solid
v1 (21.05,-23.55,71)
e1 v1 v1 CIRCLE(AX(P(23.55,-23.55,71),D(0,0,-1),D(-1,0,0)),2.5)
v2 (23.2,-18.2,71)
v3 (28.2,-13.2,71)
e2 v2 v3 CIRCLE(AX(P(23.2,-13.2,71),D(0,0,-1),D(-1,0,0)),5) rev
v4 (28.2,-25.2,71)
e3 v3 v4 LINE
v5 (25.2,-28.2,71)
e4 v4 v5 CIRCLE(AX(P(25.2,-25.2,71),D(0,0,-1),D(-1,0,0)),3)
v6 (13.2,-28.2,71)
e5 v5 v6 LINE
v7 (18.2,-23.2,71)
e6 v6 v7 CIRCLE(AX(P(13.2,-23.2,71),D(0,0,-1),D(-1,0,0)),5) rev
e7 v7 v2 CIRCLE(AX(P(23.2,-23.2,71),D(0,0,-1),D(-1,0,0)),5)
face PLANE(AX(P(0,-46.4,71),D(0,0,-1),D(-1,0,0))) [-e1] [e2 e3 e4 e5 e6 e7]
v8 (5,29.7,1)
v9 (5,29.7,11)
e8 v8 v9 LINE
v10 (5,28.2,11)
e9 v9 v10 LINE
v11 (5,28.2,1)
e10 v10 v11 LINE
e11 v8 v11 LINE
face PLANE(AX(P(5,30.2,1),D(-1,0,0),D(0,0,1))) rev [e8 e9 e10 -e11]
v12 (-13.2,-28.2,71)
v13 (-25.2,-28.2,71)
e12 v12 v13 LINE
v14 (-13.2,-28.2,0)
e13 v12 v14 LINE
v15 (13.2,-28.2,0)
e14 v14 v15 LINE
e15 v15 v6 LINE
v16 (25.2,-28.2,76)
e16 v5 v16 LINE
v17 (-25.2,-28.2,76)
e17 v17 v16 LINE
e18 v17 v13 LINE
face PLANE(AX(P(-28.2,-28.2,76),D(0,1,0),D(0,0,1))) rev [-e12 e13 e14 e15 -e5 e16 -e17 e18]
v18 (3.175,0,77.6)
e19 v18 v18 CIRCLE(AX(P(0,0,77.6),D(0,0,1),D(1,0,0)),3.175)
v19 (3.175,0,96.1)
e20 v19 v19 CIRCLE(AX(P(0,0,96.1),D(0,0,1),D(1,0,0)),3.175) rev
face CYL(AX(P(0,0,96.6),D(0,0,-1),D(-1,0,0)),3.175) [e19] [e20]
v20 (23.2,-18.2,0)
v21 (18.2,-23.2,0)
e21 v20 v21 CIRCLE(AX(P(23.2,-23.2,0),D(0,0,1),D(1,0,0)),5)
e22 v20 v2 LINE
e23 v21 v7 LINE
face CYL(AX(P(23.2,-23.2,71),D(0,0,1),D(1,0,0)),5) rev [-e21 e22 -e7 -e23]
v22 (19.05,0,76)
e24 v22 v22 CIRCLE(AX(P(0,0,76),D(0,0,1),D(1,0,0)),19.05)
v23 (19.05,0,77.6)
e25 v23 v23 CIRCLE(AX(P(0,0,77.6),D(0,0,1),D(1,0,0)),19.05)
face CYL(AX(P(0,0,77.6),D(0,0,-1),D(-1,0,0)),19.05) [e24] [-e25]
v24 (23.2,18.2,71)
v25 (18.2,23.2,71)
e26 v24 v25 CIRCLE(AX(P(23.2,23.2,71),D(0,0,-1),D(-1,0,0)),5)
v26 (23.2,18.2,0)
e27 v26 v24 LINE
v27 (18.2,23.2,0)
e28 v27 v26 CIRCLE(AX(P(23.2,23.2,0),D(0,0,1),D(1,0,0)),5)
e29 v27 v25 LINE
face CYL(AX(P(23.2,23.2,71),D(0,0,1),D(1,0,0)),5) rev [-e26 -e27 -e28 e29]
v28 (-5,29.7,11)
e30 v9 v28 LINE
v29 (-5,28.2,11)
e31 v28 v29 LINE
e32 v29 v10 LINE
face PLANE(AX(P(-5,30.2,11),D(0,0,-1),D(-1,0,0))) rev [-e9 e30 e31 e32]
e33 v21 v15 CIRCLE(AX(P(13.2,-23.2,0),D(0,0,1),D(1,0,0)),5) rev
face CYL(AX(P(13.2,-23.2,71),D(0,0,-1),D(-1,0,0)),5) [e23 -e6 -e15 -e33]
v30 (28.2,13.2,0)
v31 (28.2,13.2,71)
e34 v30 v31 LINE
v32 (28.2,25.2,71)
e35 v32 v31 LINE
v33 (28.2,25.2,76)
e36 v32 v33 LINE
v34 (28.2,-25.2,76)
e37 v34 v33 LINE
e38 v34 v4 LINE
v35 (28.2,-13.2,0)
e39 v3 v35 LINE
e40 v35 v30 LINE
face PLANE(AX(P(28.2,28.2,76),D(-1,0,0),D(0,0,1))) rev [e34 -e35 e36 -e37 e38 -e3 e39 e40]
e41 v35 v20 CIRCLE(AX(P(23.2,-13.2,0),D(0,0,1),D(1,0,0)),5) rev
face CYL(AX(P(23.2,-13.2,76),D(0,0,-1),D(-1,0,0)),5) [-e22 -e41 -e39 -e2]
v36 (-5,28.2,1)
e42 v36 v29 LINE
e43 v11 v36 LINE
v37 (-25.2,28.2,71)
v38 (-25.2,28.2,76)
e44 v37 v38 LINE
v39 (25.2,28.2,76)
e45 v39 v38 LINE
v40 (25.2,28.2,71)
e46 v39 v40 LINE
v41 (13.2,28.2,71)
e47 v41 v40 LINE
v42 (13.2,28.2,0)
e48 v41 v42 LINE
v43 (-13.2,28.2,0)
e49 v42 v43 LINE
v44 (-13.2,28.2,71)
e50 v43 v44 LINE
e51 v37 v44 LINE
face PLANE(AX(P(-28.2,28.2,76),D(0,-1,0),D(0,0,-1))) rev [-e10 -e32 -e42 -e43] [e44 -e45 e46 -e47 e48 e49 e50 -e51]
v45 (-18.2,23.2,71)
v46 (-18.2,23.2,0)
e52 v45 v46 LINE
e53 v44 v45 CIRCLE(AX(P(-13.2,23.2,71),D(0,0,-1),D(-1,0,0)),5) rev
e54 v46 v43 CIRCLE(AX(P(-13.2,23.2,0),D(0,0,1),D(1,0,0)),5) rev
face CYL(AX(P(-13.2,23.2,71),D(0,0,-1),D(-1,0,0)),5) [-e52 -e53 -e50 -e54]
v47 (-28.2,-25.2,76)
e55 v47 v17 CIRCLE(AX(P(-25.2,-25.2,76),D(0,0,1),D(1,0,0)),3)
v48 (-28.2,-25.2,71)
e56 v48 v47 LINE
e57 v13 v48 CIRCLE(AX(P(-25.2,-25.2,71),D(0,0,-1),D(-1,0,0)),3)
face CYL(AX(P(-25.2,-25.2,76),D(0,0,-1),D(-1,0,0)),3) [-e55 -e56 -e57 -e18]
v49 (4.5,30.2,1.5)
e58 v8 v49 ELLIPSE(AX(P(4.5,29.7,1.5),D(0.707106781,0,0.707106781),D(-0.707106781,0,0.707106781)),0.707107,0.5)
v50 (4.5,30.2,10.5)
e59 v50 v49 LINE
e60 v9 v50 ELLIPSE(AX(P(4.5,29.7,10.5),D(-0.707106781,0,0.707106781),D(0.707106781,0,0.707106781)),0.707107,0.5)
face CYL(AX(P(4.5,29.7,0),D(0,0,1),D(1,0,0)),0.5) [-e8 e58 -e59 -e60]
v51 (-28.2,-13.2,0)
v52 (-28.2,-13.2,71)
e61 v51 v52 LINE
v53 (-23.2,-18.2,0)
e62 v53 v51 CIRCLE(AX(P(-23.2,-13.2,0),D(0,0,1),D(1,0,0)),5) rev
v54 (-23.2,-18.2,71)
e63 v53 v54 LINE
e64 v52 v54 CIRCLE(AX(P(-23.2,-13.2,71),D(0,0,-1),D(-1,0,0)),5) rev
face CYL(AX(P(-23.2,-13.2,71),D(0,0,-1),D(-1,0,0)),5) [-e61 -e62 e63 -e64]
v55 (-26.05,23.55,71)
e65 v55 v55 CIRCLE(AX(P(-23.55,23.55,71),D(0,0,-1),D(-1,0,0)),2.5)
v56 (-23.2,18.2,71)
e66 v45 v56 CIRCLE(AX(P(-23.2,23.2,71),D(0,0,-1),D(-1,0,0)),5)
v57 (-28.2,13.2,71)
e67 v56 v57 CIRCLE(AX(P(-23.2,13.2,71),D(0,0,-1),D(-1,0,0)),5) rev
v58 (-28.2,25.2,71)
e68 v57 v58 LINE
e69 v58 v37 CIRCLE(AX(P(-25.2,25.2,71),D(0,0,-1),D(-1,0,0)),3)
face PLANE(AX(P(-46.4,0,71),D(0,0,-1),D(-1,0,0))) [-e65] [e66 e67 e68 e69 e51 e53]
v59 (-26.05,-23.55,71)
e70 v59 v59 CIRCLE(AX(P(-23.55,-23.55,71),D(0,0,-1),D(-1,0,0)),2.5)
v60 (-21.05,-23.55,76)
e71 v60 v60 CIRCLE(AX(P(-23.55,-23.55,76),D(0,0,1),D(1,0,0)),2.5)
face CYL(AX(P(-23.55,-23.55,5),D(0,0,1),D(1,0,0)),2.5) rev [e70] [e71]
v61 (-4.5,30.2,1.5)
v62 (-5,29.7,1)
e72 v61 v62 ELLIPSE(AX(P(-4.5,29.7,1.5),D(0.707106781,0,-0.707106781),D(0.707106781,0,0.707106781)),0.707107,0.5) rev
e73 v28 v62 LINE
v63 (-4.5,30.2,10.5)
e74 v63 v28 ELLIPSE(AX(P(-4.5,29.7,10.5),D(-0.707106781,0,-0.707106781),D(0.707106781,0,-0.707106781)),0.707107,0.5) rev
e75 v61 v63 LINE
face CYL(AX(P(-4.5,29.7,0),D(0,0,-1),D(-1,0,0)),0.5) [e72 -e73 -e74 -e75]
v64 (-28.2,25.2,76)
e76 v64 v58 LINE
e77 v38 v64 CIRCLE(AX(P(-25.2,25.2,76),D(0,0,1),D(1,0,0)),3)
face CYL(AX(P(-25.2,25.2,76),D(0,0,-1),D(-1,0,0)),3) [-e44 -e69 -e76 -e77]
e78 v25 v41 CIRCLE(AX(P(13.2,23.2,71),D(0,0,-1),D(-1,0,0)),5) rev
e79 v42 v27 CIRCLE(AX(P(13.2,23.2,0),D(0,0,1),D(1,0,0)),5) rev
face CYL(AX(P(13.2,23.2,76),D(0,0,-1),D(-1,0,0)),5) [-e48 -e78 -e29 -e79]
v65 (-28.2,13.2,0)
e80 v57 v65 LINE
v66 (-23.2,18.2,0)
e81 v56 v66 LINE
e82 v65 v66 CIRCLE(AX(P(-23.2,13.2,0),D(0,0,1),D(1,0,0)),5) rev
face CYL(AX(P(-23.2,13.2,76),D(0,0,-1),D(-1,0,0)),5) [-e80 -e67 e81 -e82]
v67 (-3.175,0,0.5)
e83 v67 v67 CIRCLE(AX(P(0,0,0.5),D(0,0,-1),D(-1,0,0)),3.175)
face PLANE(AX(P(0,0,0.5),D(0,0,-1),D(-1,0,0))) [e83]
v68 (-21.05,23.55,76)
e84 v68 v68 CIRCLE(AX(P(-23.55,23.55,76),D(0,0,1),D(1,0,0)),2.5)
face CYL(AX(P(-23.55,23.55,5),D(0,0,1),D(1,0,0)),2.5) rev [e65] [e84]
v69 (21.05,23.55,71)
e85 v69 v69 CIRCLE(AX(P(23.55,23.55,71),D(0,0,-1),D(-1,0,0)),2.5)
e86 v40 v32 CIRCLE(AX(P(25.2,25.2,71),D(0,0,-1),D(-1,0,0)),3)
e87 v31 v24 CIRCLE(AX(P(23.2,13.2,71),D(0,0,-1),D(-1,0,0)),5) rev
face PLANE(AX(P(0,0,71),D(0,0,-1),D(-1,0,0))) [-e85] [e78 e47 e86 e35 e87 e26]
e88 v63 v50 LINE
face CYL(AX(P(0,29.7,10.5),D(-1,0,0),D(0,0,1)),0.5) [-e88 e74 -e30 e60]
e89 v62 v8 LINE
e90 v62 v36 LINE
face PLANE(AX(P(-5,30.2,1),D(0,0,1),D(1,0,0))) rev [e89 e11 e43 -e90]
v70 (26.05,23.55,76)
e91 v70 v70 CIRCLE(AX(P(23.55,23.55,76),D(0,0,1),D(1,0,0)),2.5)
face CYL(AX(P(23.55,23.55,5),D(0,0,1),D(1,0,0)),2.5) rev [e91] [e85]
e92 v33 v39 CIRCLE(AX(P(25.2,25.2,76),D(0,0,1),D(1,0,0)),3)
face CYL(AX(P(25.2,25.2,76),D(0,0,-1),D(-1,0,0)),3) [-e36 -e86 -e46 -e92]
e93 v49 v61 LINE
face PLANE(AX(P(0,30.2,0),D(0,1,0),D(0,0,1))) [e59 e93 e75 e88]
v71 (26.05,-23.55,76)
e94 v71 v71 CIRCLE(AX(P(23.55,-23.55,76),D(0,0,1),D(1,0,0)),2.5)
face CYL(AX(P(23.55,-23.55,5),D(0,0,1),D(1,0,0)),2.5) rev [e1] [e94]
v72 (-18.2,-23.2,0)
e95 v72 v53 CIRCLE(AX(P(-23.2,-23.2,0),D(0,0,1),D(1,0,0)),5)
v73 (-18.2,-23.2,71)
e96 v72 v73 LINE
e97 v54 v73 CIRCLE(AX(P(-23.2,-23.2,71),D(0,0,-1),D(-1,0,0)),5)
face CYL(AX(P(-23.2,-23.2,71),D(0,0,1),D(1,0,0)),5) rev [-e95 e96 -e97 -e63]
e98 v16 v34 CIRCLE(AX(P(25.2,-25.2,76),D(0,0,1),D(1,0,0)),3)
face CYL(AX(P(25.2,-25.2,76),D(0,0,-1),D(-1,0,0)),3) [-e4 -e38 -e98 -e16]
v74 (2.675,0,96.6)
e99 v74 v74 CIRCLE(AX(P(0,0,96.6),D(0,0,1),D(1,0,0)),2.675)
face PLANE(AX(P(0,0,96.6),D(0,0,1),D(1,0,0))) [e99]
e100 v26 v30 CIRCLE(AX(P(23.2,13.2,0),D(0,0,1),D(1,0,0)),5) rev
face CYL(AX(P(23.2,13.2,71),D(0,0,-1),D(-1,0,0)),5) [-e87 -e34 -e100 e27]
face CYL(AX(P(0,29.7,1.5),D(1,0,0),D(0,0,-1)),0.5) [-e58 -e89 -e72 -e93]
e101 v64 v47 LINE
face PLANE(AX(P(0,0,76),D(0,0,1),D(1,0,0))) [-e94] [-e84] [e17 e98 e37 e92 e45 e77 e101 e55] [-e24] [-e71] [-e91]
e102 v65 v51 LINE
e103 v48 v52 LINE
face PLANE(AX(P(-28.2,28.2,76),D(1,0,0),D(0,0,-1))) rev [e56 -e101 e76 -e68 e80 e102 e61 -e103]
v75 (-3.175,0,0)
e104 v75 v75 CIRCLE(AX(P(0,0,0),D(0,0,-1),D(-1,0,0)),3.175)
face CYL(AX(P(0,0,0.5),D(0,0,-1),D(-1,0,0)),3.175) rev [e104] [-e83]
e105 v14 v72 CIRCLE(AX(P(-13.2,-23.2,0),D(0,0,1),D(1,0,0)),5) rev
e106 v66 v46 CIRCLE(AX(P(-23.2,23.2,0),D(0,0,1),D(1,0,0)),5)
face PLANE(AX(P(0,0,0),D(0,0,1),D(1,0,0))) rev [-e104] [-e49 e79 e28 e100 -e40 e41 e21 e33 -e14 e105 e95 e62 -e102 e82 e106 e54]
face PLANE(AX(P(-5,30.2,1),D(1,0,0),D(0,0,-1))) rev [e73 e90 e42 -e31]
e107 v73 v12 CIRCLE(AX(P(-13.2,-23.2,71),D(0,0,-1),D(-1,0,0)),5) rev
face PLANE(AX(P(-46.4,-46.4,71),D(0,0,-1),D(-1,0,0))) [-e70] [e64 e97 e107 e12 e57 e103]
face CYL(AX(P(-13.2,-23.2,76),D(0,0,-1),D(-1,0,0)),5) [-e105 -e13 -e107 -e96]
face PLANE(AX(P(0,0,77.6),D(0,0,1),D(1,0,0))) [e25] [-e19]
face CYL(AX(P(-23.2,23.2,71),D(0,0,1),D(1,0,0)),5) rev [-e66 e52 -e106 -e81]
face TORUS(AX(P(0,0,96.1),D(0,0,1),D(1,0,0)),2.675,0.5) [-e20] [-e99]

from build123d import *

# Parameters (mm, degrees)
SKETCH_1_W                  = 56.4
SKETCH_1_H                  = 56.4
EXTRUDE_1_DEPTH             = 76
SKETCH_2_R                  = 19.05
EXTRUDE_2_DEPTH             = 1.6
SKETCH_3_R                  = 3.175
EXTRUDE_3_DEPTH             = 19
SKETCH_4_R                  = 3.175
CUT_EXTRUDE_1_DEPTH         = 0.5
SKETCH_6_W                  = 10
SKETCH_6_H                  = 10
CUT_EXTRUDE_2_DEPTH         = 71
PATTERN_LINEAR_1_COUNT      = 2
PATTERN_LINEAR_1_PITCH      = 46.4
PATTERN_LINEAR_1_COUNT_DIR2 = 2
PATTERN_LINEAR_1_PITCH_DIR2 = 46.4
FILLET_1_R                  = 5
SKETCH_7_R                  = 2.5
CUT_EXTRUDE_3_DEPTH         = 71
PATTERN_LINEAR_2_COUNT      = 2
PATTERN_LINEAR_2_PITCH      = 47.1
PATTERN_LINEAR_2_COUNT_DIR2 = 2
PATTERN_LINEAR_2_PITCH_DIR2 = 47.1
FILLET_2_R                  = 3
FILLET_3_R                  = 0.5
SKETCH_8_W                  = 10
SKETCH_8_H                  = 10
EXTRUDE_4_DEPTH             = 2
FILLET_4_R                  = 0.5


with BuildPart() as part:
    # Эскиз1 → Бобышка-Вытянуть1 (new body)
    with BuildSketch(Plane.XY):
        Rectangle(SKETCH_1_W, SKETCH_1_H)
    extrude(amount=EXTRUDE_1_DEPTH)

    # Эскиз2 → Бобышка-Вытянуть2 (add)
    with BuildSketch(Plane.XY.offset(76)):
        Circle(SKETCH_2_R)
    extrude(amount=EXTRUDE_2_DEPTH)

    # Эскиз3 → Бобышка-Вытянуть3 (add)
    with BuildSketch(Plane.XY.offset(77.6)):
        Circle(SKETCH_3_R)
    extrude(amount=EXTRUDE_3_DEPTH)

    # Эскиз4 → Вырез-Вытянуть1 (cut)
    with BuildSketch(Plane(origin=(0, 0, 0), x_dir=(-1, 0, 0), z_dir=(0, 0, -1))):
        with Locations(Location((0, 0, 0), (0, 0, 180))):
            Circle(SKETCH_4_R)
    extrude(amount=-CUT_EXTRUDE_1_DEPTH, mode=Mode.SUBTRACT)

    # Эскиз6 → Вырез-Вытянуть2 (cut)
    with BuildSketch(Plane(origin=(0, 0, 0), x_dir=(-1, 0, 0), z_dir=(0, 0, -1))):
        with Locations((-23.2, 23.2)):
            Rectangle(SKETCH_6_W, SKETCH_6_H)
    cut_extrude_2 = extrude(amount=-CUT_EXTRUDE_2_DEPTH, mode=Mode.SUBTRACT)

    # Линейный массив1: Cut-Extrude 2 2 × 2
    with Locations(*[(-i * PATTERN_LINEAR_1_PITCH, -j * PATTERN_LINEAR_1_PITCH_DIR2, 0) for i in range(PATTERN_LINEAR_1_COUNT) for j in range(PATTERN_LINEAR_1_COUNT_DIR2) if (i, j) != (0, 0)]):
        add(cut_extrude_2, mode=Mode.SUBTRACT)

    # Скругление1
    fillet_1_edges = [part.edges().sort_by_distance(p)[0] for p in [
        (-28.2, 18.2, 35.5),
        (-28.2, -18.2, 35.5),
        (-18.2, -28.2, 35.5),
        (18.2, -28.2, 35.5),
        (28.2, -18.2, 35.5),
        (28.2, 18.2, 35.5),
        (-18.2, 28.2, 35.5),
        (18.2, 28.2, 35.5),
        (18.2, -18.2, 35.5),
        (-18.2, -18.2, 35.5),
        (-18.2, 18.2, 35.5),
        (18.2, 18.2, 35.5),
    ]]
    fillet(fillet_1_edges, radius=FILLET_1_R - 0.0001)  # a hair under: the kernel refuses the full size

    # Эскиз7 → Вырез-Вытянуть3 (cut)
    with BuildSketch(Plane.XY.offset(76)):
        with Locations((-23.55, 23.55)):
            Circle(SKETCH_7_R)
    cut_extrude_3 = extrude(amount=-CUT_EXTRUDE_3_DEPTH, mode=Mode.SUBTRACT)

    # Линейный массив2: Cut-Extrude 3 2 × 2
    with Locations(*[(i * PATTERN_LINEAR_2_PITCH, -j * PATTERN_LINEAR_2_PITCH_DIR2, 0) for i in range(PATTERN_LINEAR_2_COUNT) for j in range(PATTERN_LINEAR_2_COUNT_DIR2) if (i, j) != (0, 0)]):
        add(cut_extrude_3, mode=Mode.SUBTRACT)

    # Скругление2
    fillet_2_edges = [part.edges().sort_by_distance(p)[0] for p in [
        (28.2, -28.2, 73.5),
        (-28.2, -28.2, 73.5),
        (-28.2, 28.2, 73.5),
        (28.2, 28.2, 73.5),
    ]]
    fillet(fillet_2_edges, radius=FILLET_2_R)

    # Скругление3
    fillet_3_edges = [part.edges().sort_by_distance(p)[0] for p in [
        (-3.175, 0, 96.6),
    ]]
    fillet(fillet_3_edges, radius=FILLET_3_R)

    # Эскиз8 → Бобышка-Вытянуть4 (add)
    with BuildSketch(Plane(origin=(0, 28.2, 0), x_dir=(1, 0, 0), z_dir=(0, 1, 0))):
        with Locations((0, -6)):
            Rectangle(SKETCH_8_W, SKETCH_8_H)
    extrude(amount=EXTRUDE_4_DEPTH)

    # Скругление4
    fillet_4_edges = [part.edges().sort_by_distance(p)[0] for p in [
        (5, 30.2, 6),
        (0, 30.2, 1),
        (-5, 30.2, 6),
        (0, 30.2, 11),
    ]]
    fillet(fillet_4_edges, radius=FILLET_4_R)


solid = part.part
